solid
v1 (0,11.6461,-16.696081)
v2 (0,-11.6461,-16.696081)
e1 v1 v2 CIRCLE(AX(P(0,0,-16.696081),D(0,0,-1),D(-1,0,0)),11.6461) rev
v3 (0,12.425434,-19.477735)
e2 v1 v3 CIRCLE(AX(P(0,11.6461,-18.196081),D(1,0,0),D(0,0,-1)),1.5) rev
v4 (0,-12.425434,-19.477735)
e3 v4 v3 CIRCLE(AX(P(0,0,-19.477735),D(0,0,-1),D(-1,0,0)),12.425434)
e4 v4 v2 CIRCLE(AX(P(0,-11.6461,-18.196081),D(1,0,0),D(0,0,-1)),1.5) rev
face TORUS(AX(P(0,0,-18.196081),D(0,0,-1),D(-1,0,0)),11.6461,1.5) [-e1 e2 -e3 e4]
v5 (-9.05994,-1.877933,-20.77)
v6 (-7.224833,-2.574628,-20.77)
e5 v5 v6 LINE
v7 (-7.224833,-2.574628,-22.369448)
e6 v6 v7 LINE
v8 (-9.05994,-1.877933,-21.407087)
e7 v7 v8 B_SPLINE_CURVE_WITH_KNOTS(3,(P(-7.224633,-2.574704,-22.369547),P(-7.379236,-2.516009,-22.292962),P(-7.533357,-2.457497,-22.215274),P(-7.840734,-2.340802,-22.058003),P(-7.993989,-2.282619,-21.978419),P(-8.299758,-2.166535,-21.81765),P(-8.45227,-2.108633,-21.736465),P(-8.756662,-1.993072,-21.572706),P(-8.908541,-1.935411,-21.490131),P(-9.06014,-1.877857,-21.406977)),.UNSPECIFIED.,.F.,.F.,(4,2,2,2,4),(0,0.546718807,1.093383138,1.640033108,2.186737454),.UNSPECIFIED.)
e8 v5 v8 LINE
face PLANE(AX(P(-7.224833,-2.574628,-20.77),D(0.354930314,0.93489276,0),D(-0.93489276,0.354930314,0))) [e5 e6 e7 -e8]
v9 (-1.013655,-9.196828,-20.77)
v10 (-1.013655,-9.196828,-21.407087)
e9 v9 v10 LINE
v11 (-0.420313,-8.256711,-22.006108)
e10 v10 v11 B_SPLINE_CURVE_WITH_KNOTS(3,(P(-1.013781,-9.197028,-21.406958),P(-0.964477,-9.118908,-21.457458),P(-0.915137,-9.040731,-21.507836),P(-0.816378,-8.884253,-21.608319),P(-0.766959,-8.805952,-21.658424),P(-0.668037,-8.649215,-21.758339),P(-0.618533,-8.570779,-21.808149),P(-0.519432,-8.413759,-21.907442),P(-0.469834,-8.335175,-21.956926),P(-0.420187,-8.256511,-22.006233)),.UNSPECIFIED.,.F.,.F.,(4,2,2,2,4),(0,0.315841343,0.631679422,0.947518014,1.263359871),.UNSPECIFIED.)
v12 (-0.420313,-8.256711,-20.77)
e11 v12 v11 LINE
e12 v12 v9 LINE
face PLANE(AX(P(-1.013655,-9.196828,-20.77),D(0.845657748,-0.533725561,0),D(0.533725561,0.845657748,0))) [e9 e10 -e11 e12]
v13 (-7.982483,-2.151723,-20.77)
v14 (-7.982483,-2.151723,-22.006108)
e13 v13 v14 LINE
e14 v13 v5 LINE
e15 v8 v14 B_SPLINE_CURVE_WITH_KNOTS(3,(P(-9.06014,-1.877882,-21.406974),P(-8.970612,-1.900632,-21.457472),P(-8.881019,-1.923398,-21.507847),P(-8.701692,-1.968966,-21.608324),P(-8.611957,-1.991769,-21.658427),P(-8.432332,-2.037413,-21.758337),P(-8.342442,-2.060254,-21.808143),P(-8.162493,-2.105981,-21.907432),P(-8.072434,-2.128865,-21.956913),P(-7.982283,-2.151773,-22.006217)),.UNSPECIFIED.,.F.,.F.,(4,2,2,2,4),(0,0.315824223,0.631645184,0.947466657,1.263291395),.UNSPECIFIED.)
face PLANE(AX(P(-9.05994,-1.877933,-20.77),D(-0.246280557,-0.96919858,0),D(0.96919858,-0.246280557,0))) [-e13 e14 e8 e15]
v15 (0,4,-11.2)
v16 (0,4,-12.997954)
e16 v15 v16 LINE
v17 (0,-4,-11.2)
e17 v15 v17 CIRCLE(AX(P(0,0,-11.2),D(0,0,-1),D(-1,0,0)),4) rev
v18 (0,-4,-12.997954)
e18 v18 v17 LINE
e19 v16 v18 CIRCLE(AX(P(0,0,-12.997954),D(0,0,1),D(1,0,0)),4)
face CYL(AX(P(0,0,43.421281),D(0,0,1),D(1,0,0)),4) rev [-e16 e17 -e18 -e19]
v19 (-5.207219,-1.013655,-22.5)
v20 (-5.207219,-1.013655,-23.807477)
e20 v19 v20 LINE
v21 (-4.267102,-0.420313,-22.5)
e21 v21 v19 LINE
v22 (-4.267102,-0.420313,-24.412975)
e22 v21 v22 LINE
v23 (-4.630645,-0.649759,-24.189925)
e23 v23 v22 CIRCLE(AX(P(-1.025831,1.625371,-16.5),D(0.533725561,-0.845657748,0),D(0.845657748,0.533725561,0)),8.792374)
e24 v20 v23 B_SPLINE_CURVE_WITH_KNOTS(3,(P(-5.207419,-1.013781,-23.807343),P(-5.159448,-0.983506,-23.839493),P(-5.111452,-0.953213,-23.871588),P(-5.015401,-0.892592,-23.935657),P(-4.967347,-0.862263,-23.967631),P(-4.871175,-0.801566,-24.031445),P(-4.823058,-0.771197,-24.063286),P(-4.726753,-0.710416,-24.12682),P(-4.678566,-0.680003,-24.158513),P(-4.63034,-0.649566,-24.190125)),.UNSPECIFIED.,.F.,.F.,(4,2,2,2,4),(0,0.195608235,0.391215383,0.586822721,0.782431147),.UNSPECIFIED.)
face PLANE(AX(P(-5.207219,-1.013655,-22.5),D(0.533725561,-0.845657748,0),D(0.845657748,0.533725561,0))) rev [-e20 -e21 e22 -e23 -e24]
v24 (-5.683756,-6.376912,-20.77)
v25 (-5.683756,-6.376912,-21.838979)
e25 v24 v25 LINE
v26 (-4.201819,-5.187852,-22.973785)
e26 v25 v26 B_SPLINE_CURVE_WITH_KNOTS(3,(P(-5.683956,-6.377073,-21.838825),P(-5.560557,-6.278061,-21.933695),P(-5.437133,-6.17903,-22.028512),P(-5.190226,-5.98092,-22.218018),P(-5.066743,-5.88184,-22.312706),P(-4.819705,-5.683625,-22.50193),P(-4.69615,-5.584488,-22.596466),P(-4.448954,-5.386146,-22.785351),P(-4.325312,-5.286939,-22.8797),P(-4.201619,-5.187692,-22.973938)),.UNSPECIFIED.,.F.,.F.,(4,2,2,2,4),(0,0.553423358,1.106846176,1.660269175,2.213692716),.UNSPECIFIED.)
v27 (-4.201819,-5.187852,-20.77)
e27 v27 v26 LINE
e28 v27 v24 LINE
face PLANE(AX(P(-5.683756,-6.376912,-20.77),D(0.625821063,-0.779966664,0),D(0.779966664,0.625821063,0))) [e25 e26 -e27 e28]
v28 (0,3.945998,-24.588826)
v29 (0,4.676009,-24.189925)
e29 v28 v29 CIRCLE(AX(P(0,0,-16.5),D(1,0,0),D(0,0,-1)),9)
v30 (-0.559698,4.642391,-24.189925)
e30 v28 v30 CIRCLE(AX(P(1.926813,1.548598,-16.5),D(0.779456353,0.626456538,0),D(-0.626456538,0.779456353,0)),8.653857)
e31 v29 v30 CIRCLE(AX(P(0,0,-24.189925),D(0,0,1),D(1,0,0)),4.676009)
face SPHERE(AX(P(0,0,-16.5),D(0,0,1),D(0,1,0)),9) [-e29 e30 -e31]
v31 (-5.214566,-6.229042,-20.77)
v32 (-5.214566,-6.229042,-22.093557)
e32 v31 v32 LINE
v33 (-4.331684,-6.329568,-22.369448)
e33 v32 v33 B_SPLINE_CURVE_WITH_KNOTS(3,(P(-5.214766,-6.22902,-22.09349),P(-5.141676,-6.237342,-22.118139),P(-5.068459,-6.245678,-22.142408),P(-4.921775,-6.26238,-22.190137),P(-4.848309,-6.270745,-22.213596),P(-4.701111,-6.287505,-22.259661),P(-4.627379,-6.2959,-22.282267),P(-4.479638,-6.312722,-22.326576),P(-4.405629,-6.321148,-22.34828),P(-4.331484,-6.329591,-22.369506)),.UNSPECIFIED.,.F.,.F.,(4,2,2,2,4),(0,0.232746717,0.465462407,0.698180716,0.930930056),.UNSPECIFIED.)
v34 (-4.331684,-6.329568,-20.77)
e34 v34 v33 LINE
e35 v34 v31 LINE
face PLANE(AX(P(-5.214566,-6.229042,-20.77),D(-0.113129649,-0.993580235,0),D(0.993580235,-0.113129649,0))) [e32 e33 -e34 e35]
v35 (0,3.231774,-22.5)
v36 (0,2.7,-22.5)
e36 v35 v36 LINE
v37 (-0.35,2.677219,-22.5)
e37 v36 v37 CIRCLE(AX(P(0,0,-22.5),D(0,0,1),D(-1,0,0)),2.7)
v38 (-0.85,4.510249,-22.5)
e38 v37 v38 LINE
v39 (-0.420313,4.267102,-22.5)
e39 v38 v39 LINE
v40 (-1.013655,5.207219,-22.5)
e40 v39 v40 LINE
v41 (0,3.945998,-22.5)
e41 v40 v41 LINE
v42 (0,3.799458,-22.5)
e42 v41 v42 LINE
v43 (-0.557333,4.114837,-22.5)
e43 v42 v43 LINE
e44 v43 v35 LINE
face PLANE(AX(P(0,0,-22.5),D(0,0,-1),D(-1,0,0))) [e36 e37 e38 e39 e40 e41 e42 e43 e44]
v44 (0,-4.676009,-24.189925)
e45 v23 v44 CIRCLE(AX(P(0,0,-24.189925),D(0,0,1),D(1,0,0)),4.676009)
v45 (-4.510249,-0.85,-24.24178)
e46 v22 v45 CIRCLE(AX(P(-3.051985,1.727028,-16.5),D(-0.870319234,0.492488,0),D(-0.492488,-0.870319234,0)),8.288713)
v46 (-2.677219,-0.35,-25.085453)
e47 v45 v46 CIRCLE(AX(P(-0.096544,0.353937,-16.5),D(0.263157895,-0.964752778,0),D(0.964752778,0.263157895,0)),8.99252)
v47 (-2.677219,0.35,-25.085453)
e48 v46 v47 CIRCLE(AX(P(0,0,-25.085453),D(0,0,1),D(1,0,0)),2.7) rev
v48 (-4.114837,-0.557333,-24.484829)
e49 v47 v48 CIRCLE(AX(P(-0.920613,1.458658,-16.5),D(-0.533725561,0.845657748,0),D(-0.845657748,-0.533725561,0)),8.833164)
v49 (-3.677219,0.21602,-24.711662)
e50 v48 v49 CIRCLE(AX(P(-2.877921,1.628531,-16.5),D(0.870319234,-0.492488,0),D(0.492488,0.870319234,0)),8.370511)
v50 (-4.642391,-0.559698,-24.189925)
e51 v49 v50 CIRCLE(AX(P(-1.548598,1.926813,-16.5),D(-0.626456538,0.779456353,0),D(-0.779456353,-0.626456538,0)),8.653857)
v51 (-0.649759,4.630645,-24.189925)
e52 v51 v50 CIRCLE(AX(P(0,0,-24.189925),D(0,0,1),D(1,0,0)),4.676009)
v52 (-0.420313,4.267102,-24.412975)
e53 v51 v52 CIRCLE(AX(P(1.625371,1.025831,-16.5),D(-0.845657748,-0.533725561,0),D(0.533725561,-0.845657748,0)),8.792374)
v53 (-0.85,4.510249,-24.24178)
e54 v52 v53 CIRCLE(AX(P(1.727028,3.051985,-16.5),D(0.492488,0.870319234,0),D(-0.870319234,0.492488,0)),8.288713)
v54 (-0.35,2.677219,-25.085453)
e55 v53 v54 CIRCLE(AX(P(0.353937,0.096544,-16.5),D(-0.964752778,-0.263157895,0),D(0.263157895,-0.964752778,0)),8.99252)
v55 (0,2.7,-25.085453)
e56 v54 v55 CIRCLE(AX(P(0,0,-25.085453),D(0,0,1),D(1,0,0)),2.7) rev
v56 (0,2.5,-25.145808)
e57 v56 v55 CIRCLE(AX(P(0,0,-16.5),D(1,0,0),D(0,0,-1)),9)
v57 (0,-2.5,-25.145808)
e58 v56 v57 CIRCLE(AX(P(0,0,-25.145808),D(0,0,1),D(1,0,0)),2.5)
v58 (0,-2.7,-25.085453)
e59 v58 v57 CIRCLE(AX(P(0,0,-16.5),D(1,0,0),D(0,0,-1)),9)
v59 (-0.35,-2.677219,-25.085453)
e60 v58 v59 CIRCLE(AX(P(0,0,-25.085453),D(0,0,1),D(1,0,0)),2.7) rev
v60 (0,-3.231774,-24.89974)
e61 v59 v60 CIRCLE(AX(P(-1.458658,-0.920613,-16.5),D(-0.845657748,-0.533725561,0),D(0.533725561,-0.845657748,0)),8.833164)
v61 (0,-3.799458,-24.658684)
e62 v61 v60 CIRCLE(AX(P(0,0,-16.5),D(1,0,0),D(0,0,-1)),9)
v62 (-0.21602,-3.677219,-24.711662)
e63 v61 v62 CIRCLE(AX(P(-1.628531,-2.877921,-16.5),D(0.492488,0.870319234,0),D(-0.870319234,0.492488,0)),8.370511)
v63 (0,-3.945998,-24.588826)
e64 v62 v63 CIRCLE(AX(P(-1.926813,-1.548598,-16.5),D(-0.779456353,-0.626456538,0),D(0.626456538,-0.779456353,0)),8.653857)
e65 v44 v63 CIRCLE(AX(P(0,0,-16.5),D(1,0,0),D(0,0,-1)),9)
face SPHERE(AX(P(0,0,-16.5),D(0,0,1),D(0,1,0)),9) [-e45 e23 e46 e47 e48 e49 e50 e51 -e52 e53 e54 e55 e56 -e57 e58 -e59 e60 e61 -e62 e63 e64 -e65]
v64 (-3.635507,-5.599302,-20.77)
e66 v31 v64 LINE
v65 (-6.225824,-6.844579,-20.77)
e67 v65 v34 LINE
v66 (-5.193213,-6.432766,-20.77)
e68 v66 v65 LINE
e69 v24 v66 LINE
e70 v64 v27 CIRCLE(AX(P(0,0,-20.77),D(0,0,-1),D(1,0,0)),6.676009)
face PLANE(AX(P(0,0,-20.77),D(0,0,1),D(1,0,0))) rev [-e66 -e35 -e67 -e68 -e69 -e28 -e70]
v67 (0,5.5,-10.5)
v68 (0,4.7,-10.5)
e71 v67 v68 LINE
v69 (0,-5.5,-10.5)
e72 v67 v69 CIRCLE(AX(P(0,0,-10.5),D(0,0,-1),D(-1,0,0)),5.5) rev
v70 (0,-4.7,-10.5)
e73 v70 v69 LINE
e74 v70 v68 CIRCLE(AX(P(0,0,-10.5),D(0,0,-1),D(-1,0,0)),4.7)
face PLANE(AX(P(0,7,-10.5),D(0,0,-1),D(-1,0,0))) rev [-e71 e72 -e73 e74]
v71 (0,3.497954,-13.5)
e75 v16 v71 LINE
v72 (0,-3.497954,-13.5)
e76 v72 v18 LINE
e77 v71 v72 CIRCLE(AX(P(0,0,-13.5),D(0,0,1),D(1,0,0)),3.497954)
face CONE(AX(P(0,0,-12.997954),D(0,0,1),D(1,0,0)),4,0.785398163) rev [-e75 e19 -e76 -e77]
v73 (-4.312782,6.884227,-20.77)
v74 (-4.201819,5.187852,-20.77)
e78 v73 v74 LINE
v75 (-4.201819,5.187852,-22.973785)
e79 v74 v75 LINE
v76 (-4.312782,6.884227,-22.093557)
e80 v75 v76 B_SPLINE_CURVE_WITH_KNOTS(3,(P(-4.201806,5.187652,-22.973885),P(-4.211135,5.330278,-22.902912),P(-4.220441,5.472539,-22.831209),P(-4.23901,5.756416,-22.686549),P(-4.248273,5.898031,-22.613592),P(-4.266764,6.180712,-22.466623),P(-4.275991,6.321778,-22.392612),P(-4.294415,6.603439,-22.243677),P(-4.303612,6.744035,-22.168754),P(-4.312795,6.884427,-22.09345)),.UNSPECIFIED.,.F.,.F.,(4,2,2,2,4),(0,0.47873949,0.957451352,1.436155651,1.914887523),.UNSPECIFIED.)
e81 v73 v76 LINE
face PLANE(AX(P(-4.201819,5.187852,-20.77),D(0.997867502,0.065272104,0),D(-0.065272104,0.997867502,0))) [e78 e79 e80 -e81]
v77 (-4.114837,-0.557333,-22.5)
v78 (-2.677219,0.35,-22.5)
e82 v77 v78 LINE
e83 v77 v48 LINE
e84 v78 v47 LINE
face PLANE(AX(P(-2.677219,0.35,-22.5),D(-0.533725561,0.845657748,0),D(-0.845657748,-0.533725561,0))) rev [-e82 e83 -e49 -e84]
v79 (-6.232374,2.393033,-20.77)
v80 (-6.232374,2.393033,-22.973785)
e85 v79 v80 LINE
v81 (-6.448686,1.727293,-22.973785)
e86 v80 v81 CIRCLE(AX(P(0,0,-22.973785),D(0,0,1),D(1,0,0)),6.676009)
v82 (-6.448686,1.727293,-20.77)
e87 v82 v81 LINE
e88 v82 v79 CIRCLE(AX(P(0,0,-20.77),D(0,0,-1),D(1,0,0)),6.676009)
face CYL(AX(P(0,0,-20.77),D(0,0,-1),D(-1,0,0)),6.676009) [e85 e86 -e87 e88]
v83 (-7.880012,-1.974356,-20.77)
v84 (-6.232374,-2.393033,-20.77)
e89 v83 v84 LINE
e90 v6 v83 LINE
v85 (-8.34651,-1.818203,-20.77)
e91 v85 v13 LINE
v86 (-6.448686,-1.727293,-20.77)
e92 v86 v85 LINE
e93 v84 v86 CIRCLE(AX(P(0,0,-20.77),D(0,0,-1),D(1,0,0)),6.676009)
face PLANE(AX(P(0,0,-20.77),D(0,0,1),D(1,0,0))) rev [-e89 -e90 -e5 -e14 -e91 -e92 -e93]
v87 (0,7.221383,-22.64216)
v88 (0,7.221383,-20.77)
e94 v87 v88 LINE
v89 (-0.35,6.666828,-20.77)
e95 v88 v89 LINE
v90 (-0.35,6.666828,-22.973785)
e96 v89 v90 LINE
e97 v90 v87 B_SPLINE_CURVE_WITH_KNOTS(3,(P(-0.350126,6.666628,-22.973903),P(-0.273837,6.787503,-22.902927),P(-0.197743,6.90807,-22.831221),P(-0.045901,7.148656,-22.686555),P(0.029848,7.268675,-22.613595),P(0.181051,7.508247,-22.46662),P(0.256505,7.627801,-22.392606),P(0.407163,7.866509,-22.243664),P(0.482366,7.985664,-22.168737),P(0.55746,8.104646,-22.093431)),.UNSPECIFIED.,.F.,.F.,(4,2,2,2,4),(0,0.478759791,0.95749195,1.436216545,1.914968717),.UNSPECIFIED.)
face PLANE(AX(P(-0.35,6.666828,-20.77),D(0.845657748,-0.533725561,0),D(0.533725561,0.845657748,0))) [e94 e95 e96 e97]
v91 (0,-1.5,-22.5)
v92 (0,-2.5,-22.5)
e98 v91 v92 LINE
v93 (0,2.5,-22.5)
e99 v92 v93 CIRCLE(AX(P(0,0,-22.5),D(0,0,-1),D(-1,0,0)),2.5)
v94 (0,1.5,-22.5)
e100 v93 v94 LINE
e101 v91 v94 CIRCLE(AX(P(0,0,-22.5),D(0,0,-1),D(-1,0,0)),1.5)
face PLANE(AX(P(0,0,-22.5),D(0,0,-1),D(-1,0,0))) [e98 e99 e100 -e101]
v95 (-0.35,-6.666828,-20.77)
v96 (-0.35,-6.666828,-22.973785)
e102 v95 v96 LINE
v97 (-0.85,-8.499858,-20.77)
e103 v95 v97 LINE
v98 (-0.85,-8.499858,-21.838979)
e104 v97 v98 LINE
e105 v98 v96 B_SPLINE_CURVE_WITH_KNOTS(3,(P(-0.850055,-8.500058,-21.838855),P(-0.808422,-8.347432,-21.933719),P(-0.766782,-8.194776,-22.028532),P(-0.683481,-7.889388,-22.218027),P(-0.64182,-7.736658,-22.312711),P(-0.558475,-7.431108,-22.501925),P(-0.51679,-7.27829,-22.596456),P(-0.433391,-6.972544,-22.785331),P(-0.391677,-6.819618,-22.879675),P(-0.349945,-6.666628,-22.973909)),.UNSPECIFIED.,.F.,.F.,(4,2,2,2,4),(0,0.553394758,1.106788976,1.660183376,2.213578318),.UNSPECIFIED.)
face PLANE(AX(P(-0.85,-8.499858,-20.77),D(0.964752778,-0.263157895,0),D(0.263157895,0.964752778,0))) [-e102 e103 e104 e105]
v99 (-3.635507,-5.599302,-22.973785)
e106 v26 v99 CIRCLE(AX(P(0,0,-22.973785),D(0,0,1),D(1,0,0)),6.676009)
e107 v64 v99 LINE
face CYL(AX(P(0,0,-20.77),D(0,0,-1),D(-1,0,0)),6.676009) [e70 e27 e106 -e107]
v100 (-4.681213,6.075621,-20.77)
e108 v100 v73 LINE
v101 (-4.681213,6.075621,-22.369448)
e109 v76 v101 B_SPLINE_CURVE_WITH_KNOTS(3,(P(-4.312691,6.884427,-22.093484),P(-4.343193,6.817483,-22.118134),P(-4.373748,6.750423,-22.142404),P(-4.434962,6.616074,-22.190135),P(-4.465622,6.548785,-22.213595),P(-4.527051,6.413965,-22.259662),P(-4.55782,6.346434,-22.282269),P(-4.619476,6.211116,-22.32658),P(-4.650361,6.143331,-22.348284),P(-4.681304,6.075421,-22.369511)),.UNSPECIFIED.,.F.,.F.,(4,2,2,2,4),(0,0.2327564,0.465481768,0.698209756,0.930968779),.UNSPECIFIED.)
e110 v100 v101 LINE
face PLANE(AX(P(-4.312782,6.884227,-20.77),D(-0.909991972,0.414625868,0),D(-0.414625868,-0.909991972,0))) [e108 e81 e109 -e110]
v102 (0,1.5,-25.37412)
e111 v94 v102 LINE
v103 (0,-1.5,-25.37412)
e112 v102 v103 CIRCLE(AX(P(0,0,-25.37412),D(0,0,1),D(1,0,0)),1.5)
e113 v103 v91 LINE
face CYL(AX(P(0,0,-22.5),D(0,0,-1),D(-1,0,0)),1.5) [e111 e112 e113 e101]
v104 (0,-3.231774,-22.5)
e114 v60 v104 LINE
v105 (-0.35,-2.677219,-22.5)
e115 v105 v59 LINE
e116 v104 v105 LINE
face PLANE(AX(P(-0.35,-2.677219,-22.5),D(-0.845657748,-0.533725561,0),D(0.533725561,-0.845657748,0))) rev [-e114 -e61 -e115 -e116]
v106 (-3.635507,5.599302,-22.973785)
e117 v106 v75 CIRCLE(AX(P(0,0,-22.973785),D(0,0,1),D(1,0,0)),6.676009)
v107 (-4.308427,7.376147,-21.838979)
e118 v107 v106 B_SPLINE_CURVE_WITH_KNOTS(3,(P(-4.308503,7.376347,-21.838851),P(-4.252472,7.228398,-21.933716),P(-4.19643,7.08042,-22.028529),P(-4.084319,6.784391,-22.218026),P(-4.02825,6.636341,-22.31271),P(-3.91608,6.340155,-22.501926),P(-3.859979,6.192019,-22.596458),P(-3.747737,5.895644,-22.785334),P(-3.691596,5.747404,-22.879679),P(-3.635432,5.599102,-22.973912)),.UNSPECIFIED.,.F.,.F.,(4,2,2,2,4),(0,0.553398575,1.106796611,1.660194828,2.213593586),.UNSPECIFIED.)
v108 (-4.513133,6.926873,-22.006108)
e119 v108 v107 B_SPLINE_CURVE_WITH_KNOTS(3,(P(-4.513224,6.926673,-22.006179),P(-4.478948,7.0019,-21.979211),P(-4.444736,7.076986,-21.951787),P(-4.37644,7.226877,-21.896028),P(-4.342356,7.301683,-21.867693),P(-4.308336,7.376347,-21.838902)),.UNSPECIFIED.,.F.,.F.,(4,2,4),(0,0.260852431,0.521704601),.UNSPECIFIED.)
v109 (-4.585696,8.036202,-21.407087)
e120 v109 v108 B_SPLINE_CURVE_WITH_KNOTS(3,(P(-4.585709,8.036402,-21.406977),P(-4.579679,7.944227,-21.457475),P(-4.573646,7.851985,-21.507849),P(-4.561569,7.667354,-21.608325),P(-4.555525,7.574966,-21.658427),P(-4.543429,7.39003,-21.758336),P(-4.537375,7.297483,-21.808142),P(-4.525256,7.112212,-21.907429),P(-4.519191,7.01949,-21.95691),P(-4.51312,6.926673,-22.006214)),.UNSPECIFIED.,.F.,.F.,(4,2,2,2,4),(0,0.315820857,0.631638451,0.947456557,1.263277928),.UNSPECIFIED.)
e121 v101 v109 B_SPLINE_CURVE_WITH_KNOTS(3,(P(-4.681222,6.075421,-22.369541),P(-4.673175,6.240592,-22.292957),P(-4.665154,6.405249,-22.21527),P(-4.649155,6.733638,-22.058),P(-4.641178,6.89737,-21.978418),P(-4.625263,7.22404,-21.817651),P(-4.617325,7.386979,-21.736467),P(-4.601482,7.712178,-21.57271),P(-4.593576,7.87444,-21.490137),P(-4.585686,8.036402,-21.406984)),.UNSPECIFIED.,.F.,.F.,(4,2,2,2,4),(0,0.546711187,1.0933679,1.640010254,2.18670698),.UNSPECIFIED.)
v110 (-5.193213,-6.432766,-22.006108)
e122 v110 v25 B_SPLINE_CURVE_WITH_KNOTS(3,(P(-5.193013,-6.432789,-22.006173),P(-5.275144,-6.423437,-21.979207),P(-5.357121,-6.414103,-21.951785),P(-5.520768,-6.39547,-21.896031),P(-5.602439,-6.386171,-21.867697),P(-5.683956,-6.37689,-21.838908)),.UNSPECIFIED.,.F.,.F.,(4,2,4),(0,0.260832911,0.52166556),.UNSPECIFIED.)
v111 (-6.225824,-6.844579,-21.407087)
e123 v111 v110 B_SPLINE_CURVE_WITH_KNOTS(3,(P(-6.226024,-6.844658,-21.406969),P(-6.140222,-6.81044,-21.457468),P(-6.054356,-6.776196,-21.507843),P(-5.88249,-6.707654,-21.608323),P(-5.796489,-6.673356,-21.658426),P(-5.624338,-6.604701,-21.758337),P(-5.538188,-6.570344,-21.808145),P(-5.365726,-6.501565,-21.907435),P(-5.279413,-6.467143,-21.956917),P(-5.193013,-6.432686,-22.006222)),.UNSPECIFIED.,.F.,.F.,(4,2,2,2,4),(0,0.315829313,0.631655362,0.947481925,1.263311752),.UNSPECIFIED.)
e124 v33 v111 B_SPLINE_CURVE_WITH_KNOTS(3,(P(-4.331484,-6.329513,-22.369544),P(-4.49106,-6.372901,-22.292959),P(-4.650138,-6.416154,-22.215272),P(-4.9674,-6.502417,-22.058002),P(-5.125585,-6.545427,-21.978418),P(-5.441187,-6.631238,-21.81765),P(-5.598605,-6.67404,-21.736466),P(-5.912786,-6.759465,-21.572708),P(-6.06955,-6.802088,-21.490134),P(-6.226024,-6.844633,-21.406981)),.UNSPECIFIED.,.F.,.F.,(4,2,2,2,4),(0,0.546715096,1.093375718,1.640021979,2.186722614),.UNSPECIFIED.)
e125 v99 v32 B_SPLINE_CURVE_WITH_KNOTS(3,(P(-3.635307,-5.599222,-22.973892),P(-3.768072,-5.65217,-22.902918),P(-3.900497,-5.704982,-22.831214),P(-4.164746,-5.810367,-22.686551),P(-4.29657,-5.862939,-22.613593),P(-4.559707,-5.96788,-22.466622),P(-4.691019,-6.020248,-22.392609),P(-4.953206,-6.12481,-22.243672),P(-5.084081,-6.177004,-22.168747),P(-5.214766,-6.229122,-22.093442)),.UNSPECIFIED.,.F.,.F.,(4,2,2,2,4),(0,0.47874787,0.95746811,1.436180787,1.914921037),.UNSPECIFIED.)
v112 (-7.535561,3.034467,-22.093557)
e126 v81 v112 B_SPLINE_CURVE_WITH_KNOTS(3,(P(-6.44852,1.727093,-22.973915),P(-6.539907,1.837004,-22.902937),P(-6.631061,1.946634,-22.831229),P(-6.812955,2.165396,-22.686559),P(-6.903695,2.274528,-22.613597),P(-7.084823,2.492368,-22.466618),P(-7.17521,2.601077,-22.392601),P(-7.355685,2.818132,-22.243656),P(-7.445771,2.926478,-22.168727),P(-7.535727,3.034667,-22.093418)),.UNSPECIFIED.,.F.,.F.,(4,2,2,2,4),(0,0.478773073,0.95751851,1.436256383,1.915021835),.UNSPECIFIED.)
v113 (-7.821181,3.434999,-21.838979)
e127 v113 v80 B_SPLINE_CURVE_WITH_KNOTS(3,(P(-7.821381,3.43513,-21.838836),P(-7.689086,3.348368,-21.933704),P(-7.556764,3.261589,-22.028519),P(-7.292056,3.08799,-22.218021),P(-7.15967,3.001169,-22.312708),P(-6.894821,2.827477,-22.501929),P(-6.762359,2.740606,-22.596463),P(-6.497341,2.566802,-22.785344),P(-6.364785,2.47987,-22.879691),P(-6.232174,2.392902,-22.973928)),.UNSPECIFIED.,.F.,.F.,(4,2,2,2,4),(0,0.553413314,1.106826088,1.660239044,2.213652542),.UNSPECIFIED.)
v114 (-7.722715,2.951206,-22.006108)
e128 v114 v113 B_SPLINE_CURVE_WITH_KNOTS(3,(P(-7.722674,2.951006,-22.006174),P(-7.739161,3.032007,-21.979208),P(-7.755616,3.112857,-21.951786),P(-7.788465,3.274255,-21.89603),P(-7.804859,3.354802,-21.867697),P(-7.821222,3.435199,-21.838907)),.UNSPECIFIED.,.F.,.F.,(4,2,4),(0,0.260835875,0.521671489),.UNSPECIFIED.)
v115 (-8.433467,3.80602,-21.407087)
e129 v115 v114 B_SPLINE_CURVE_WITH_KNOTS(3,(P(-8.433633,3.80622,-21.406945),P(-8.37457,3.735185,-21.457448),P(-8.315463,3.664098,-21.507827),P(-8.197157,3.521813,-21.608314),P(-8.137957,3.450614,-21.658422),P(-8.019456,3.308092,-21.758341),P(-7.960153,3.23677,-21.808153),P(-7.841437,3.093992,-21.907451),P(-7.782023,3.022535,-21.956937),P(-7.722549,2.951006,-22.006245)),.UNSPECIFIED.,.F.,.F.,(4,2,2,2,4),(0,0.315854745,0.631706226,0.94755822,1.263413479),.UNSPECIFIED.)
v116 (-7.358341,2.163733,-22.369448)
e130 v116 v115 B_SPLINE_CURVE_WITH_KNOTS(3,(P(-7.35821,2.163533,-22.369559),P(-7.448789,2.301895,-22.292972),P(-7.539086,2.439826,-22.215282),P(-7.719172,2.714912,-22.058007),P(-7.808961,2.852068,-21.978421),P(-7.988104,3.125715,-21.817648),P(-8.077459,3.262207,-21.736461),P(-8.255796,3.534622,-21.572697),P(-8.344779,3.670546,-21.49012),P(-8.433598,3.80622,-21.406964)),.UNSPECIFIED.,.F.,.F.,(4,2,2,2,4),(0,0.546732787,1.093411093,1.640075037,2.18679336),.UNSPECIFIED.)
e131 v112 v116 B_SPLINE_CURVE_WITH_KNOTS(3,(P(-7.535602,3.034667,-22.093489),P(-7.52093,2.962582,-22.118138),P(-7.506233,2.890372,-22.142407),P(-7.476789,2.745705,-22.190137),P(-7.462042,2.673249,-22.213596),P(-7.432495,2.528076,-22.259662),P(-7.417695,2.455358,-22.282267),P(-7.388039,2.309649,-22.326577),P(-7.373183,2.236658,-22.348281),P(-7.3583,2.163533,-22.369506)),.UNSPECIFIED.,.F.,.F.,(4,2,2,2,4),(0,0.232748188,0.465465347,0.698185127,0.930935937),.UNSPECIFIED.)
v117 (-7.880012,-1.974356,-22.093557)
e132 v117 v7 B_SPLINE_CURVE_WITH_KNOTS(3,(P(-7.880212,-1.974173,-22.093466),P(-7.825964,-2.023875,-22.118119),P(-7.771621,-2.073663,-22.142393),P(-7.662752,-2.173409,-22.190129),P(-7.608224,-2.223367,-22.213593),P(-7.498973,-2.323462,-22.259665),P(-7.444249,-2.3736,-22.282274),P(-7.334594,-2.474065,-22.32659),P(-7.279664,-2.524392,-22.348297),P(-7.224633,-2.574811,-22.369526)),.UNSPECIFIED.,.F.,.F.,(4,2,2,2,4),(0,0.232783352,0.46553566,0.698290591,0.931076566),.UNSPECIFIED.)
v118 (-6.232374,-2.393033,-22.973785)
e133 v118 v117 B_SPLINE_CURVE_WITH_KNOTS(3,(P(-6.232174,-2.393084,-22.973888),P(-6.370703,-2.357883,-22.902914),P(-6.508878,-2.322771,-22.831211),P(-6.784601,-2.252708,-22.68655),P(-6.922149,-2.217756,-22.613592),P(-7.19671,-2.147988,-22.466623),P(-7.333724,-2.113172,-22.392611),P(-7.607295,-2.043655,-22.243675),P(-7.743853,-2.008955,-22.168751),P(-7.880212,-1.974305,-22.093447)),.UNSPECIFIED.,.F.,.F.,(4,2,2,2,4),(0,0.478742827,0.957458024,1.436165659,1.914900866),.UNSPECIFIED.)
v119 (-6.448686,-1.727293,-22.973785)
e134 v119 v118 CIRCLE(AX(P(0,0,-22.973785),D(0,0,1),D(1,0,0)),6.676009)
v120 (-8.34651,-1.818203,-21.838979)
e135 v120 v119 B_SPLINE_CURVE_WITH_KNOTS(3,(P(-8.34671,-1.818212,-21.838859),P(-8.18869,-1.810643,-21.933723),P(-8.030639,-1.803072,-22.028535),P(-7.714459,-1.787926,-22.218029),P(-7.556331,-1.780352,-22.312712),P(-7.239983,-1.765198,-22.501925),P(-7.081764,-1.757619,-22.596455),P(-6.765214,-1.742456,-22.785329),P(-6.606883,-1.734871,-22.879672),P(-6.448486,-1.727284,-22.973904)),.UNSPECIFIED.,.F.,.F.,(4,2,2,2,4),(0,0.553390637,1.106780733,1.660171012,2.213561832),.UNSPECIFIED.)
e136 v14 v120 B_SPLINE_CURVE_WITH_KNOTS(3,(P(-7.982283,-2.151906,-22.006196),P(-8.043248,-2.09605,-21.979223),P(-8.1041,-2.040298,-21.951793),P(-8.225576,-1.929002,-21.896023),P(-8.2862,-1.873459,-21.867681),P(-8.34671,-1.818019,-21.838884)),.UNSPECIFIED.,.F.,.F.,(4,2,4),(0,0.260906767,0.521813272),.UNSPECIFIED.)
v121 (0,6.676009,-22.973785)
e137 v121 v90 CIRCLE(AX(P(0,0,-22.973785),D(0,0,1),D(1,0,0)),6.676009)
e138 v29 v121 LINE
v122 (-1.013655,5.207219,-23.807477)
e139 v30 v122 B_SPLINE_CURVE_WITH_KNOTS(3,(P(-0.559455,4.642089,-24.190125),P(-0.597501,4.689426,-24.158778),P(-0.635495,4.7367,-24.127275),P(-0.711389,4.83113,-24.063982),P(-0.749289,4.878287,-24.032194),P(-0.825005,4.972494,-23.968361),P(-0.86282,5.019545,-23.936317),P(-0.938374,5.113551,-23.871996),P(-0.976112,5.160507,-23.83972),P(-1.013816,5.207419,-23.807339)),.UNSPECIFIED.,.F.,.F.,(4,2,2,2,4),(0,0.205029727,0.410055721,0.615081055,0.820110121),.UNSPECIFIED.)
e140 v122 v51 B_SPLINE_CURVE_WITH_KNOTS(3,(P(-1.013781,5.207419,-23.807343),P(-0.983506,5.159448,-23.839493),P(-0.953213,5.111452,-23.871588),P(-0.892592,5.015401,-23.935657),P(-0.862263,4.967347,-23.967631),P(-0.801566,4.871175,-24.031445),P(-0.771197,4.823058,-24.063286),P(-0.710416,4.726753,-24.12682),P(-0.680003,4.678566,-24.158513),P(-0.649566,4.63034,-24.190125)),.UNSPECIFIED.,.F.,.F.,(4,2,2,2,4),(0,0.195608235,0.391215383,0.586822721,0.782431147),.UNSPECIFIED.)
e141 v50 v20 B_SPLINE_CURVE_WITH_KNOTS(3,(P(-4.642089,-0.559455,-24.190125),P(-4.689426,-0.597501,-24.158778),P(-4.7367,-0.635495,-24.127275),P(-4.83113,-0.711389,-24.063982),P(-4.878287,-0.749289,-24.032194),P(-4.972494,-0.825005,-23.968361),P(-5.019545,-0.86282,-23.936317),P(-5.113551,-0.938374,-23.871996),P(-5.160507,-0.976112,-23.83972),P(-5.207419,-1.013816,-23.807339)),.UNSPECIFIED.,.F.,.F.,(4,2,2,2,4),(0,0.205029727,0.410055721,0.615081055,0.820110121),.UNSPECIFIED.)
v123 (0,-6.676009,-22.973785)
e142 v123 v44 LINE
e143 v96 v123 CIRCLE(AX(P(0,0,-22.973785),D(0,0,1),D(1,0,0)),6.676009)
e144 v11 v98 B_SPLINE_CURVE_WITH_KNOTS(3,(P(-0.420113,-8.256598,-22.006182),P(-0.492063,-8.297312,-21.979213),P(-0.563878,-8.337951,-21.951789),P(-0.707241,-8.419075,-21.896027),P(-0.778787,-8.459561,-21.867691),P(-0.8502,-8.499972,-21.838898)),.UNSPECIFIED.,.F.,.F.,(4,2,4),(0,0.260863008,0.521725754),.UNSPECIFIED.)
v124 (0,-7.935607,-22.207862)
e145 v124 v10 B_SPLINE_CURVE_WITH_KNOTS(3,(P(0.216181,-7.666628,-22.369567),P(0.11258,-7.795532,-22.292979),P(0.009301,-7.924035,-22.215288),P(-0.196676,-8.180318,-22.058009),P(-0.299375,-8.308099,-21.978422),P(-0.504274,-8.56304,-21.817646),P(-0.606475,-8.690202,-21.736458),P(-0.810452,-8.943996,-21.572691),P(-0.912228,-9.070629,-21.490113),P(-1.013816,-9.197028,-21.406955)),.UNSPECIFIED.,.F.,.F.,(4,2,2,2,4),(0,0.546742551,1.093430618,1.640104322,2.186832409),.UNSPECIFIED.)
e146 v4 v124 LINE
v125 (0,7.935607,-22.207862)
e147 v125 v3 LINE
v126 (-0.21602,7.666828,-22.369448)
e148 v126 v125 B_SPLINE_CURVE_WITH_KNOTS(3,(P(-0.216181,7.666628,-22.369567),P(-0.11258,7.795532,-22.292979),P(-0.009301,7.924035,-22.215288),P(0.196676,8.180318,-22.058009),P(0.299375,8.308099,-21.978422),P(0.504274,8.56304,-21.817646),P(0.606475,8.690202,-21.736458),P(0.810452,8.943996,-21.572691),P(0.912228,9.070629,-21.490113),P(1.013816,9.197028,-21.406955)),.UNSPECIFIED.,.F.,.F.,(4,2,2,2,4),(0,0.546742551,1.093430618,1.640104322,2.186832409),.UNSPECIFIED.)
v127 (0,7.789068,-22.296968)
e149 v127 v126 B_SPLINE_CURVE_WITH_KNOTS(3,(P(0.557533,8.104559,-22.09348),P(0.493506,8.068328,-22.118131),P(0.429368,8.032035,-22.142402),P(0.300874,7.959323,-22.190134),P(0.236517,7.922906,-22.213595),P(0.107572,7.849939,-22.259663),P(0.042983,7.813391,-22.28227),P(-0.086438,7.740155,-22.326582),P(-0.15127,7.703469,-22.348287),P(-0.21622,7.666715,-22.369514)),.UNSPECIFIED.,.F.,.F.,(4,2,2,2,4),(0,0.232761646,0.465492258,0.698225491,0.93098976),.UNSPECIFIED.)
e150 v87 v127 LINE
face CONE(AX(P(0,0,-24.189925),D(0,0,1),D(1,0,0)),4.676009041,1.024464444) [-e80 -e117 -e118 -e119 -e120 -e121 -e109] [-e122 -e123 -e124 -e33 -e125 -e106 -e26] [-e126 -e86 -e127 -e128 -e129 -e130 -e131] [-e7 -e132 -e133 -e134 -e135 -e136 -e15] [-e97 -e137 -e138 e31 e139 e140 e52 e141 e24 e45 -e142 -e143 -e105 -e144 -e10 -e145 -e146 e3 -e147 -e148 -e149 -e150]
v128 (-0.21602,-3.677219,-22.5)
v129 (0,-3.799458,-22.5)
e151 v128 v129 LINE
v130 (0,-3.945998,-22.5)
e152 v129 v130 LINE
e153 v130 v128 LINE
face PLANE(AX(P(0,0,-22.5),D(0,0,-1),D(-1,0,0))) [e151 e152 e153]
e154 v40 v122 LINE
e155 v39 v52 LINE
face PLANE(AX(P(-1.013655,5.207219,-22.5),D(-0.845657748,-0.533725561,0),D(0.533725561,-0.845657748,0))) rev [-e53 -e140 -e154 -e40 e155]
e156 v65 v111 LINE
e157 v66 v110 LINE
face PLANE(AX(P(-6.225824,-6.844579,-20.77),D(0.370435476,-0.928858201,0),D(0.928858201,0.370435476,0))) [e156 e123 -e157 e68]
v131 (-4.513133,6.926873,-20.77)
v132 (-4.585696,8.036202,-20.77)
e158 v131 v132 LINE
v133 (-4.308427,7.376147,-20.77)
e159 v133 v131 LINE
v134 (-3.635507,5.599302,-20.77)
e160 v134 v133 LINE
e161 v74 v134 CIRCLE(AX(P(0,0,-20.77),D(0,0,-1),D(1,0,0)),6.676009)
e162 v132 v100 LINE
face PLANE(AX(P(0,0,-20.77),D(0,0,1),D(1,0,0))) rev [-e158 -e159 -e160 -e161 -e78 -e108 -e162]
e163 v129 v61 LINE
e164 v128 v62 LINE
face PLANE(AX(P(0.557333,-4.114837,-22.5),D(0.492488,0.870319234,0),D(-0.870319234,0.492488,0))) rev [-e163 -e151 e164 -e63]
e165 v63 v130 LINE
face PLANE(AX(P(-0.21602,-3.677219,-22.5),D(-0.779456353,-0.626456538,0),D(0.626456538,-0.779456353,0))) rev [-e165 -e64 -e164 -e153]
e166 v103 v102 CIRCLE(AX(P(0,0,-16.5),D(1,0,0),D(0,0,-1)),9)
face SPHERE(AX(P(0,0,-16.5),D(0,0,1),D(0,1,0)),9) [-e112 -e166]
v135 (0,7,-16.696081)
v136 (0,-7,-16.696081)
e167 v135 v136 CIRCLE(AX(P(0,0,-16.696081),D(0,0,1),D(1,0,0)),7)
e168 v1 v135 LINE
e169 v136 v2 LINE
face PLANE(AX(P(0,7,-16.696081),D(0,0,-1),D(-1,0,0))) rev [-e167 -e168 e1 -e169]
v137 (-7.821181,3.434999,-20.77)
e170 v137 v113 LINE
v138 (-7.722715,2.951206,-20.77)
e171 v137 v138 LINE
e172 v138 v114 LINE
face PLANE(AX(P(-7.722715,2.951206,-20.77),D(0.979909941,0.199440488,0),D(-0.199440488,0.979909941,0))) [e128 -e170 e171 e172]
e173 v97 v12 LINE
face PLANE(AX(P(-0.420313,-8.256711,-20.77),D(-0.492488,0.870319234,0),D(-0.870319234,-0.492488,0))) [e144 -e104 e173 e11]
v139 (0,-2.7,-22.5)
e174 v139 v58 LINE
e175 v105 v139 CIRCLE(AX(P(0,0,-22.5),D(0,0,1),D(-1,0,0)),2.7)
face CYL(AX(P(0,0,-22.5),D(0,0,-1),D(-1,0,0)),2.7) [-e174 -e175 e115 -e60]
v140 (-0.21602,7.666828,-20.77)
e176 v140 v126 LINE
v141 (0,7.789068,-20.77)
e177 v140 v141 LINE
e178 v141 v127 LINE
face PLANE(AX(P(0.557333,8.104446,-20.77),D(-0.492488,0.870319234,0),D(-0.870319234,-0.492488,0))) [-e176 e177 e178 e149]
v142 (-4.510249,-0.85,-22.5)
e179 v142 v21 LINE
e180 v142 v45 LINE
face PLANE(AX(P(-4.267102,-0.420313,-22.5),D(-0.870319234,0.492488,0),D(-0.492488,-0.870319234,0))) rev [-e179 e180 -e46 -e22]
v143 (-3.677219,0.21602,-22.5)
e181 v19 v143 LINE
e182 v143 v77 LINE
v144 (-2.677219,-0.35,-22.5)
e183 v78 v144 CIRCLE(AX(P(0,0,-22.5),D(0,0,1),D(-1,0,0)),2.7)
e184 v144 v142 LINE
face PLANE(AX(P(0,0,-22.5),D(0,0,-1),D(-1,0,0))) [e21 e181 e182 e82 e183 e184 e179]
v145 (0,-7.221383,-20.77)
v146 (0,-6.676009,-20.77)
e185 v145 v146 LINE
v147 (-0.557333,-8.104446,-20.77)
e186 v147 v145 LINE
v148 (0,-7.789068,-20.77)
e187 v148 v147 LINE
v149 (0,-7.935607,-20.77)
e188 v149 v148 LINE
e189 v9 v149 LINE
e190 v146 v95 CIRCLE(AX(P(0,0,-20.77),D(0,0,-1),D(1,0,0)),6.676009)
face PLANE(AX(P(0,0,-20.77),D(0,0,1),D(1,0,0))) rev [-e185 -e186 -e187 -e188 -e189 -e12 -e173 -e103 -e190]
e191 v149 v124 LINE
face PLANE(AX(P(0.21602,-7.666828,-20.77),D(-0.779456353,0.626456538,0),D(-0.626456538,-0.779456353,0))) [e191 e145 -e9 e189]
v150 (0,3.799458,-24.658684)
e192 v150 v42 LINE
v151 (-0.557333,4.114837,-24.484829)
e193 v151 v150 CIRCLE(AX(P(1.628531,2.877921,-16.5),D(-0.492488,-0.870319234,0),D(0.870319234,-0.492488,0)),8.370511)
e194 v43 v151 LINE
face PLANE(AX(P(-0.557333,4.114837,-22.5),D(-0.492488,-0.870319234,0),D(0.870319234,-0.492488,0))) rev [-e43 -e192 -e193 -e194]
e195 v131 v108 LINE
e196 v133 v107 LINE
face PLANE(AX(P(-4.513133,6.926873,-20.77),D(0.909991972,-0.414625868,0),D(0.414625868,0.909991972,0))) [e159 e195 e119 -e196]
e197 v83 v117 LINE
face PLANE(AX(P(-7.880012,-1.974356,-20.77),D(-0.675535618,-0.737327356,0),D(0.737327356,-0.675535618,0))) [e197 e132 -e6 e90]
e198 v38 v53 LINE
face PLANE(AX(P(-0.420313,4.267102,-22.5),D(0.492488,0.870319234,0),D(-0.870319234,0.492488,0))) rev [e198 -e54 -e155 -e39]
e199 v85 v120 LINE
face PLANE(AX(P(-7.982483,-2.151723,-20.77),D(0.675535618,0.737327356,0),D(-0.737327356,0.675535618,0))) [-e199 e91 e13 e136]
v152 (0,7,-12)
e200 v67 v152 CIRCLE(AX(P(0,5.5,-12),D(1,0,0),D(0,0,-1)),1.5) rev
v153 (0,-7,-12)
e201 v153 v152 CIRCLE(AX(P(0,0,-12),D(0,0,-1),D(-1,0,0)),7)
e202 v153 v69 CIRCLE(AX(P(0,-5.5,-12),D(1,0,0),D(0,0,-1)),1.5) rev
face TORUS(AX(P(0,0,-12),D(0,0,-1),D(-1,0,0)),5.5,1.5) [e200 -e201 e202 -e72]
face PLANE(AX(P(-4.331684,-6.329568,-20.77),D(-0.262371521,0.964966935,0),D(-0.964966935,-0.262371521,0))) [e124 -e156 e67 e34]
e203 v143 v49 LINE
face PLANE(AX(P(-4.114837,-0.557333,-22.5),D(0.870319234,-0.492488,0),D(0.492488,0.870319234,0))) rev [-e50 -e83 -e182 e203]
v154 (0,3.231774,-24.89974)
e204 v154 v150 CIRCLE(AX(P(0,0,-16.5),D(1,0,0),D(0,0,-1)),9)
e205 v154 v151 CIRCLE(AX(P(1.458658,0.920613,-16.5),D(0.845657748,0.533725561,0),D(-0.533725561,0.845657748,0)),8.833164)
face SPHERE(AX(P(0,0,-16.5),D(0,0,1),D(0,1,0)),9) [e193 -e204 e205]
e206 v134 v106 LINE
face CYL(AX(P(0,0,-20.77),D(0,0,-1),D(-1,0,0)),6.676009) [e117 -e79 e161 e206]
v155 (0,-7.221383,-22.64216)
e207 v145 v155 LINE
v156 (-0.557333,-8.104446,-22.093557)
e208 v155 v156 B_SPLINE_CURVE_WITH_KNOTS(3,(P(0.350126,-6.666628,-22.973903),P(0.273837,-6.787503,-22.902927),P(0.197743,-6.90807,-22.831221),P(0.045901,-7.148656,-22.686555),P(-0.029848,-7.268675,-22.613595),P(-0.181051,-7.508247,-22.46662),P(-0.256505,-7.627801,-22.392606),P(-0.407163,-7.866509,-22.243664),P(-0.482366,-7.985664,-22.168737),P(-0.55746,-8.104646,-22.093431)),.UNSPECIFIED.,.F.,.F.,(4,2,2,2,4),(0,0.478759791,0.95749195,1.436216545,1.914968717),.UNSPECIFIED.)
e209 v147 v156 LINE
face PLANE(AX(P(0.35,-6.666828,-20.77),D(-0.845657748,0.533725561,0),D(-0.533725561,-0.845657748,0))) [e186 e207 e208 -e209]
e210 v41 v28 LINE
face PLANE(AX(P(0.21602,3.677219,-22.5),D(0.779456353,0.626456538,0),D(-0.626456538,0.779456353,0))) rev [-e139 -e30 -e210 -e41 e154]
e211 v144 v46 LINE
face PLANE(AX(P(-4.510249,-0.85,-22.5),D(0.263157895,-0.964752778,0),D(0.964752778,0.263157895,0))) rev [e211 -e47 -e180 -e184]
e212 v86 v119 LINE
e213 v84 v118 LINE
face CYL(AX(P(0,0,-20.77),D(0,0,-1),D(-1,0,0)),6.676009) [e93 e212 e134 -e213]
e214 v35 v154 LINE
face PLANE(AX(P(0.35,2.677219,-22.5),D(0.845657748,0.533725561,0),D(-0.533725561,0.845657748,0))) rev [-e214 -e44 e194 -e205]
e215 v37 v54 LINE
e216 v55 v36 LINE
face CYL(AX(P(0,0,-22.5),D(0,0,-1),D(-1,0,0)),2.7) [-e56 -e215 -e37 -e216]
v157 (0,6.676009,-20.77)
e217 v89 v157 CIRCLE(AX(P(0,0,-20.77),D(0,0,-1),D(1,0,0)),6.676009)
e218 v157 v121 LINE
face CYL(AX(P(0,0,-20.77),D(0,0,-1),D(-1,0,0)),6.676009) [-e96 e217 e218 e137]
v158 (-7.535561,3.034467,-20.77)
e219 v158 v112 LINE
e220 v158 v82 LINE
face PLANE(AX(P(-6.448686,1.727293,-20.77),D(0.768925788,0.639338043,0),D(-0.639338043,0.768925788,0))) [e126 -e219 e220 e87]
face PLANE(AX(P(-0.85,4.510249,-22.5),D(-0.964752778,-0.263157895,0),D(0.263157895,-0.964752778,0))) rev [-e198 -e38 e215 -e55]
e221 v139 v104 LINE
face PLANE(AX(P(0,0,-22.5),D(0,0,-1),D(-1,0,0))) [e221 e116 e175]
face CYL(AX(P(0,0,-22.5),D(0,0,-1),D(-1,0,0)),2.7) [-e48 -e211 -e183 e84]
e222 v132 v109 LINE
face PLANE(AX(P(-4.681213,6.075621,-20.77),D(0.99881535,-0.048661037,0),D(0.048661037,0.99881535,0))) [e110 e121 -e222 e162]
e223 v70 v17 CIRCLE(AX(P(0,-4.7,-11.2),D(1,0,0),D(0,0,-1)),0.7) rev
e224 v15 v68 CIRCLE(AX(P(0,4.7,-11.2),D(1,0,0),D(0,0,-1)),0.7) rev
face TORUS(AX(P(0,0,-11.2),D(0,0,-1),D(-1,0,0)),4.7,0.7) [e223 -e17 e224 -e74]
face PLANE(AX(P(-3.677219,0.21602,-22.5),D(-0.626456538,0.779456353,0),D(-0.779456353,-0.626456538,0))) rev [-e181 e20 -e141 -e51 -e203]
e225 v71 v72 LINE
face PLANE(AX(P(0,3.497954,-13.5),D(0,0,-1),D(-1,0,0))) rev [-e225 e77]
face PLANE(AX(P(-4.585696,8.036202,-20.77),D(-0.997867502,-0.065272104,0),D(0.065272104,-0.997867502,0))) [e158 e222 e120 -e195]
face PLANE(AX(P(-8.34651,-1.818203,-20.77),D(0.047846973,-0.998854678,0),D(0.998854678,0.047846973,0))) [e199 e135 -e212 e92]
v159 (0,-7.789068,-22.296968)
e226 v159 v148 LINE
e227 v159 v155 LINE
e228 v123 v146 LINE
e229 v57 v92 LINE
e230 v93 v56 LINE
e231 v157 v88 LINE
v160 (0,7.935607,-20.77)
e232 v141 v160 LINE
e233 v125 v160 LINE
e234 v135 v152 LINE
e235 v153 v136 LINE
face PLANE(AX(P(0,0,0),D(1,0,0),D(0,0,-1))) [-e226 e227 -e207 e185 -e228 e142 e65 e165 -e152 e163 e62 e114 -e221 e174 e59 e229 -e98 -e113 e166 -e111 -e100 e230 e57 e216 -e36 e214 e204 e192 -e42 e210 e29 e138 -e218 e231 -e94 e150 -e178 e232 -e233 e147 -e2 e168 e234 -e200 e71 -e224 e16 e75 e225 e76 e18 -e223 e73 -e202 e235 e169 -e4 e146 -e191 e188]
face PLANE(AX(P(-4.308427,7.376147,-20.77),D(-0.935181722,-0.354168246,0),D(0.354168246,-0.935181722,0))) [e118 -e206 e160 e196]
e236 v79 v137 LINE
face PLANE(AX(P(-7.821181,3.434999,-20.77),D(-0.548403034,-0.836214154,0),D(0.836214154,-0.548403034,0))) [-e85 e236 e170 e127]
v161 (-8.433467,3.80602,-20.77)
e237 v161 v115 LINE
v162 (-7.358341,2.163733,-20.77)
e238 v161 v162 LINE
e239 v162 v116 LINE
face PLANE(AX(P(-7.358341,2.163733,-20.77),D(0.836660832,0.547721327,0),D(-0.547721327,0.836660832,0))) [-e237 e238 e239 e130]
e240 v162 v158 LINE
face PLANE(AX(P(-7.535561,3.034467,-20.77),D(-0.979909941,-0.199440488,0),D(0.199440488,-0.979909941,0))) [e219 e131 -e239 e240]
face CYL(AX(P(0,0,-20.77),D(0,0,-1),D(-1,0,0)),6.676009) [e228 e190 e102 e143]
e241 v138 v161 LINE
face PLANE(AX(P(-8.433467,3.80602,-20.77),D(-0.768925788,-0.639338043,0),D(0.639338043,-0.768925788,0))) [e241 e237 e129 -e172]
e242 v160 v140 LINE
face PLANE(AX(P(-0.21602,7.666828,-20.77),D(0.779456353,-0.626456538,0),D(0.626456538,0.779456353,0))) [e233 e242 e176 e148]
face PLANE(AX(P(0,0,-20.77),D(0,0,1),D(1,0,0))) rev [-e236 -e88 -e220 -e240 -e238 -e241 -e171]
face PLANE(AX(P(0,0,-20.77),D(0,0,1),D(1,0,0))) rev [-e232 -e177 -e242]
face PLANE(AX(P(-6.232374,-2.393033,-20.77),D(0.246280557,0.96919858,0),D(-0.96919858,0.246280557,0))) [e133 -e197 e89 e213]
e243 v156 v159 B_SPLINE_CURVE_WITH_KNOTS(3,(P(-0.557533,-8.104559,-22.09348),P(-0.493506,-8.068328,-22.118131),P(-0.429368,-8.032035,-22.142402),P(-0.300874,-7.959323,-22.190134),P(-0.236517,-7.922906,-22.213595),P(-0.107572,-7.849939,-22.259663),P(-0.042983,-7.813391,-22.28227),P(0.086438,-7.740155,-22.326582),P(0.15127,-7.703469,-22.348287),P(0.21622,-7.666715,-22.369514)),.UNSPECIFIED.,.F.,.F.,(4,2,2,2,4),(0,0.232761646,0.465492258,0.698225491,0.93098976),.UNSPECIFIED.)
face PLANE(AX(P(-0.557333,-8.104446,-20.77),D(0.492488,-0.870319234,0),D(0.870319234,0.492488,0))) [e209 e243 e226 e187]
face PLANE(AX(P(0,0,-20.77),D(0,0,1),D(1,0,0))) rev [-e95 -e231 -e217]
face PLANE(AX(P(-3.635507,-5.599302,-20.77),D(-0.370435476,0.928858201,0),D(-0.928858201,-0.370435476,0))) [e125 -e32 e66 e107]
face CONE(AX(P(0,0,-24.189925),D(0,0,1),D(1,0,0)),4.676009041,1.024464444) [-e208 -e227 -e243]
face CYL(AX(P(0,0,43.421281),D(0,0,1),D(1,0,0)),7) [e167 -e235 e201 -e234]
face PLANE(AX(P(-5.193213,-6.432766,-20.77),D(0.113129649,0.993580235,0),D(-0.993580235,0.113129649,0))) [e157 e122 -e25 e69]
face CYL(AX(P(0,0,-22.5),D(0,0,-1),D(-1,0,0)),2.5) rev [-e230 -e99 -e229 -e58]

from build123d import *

# Parameters (mm, degrees)
REDONDEO3_R           = 0.7
REDONDEO5_R           = 1.5
CROQUIS2_R            = 2.5
CROQUIS2_R_2          = 1.5
CORTAR_EXTRUIR1_DEPTH = 3
CORTAR_EXTRUIR3_DEPTH = 3


# Read off the part's stored shape, not the designer's step: Sólido-Eliminar/Conservar 1
with BuildPart() as part:
    # Croquis1 → Revolución1 (revolve)
    with BuildSketch(Plane(origin=(0, 0, 0), x_dir=(0, 0, -1), z_dir=(1, 0, 0)), mode=Mode.PRIVATE) as revoluci_n1_sk:
        with BuildLine():
            Line((10.5, 4), (12.997954185, 4))
            Line((12.997954185, 4), (13.5, 3.497954185))
            Line((13.5, 3.497954185), (13.5, 0))
            Line((13.5, 0), (25.5, 0))
            ThreePointArc((25.5, 0), (25.166294504, 2.428032035), (24.189924541, 4.676009041))
            Line((24.189924541, 4.676009041), (16.696080767, 17))
            Line((16.696080767, 17), (16.696080767, 7))
            Line((16.696080767, 7), (10.5, 7))
            Line((10.5, 7), (10.5, 4))
        make_face()
    revolve(revoluci_n1_sk.sketch.rotate(Axis((0, 0, 43.421280629), (0, 0, -1)), 90), axis=Axis((0, 0, 43.421280629), (0, 0, -1)))

    # Redondeo3
    redondeo3_edges = [part.edges().sort_by_distance(p)[0] for p in [
        (-4, 0, -10.5),
    ]]
    fillet(redondeo3_edges, radius=REDONDEO3_R)

    # Redondeo5
    redondeo5_edges = [part.edges().sort_by_distance(p)[0] for p in [
        (-17, 0, -16.696080767),
        (-7, 0, -10.5),
    ]]
    fillet(redondeo5_edges, radius=REDONDEO5_R)

    # Croquis2 → Cortar-Extruir1 (cut)
    # profile 1 of 5: a face of its own
    with BuildSketch(Plane(origin=(0, 0, -25.5), x_dir=(-1, 0, 0), z_dir=(0, 0, -1))):
        Circle(CROQUIS2_R)
        Circle(CROQUIS2_R_2, mode=Mode.SUBTRACT)
    # profile 2 of 5: a face of its own
    with BuildSketch(Plane(origin=(0, 0, -25.5), x_dir=(-1, 0, 0), z_dir=(0, 0, -1))):
        with BuildLine():
            Line((-0.35, 2.677218706), (0.557333453, 4.114836877))
            Line((0.557333453, 4.114836877), (-0.216020438, 3.677218706))
            Line((-0.216020438, 3.677218706), (1.01365522, 5.207218706))
            Line((1.01365522, 5.207218706), (0.420313019, 4.267101787))
            Line((0.420313019, 4.267101787), (0.85, 4.510248984))
            Line((0.85, 4.510248984), (0.35, 2.677218706))
            ThreePointArc((0.35, 2.677218706), (0, 2.7), (-0.35, 2.677218706))
        make_face()
    # profile 3 of 5: a face of its own
    with BuildSketch(Plane(origin=(0, 0, -25.5), x_dir=(-1, 0, 0), z_dir=(0, 0, -1))):
        with BuildLine():
            Line((4.510248984, -0.85), (2.677218706, -0.35))
            ThreePointArc((2.677218706, -0.35), (2.7, 0), (2.677218706, 0.35))
            Line((2.677218706, 0.35), (4.114836877, -0.557333453))
            Line((4.114836877, -0.557333453), (3.677218706, 0.216020438))
            Line((3.677218706, 0.216020438), (5.207218706, -1.01365522))
            Line((5.207218706, -1.01365522), (4.267101787, -0.420313019))
            Line((4.267101787, -0.420313019), (4.510248984, -0.85))
        make_face()
    # profile 4 of 5: a face of its own
    with BuildSketch(Plane(origin=(0, 0, -25.5), x_dir=(-1, 0, 0), z_dir=(0, 0, -1))):
        with BuildLine():
            Line((-0.85, -4.510248984), (-0.35, -2.677218706))
            ThreePointArc((-0.35, -2.677218706), (0, -2.7), (0.35, -2.677218706))
            Line((0.35, -2.677218706), (-0.557333453, -4.114836877))
            Line((-0.557333453, -4.114836877), (0.216020438, -3.677218706))
            Line((0.216020438, -3.677218706), (-1.01365522, -5.207218706))
            Line((-1.01365522, -5.207218706), (-0.420313019, -4.267101787))
            Line((-0.420313019, -4.267101787), (-0.85, -4.510248984))
        make_face()
    # profile 5 of 5: a face of its own
    with BuildSketch(Plane(origin=(0, 0, -25.5), x_dir=(-1, 0, 0), z_dir=(0, 0, -1))):
        with BuildLine():
            Line((-4.510248984, 0.85), (-2.677218706, 0.35))
            ThreePointArc((-2.677218706, 0.35), (-2.7, 0), (-2.677218706, -0.35))
            Line((-2.677218706, -0.35), (-4.114836877, 0.557333453))
            Line((-4.114836877, 0.557333453), (-3.677218706, -0.216020438))
            Line((-3.677218706, -0.216020438), (-5.207218706, 1.01365522))
            Line((-5.207218706, 1.01365522), (-4.267101787, 0.420313019))
            Line((-4.267101787, 0.420313019), (-4.510248984, 0.85))
        make_face()
    extrude(amount=-CORTAR_EXTRUIR1_DEPTH, mode=Mode.SUBTRACT)

    # Croquis3 → Cortar-Extruir3 (cut)
    with BuildSketch(Plane.XY.offset(-23.77)):
        with BuildLine():
            Line((-0.35, 6.666828085), (0.557333453, 8.104446256))
            Line((0.557333453, 8.104446256), (-0.216020438, 7.666828085))
            Line((-0.216020438, 7.666828085), (1.01365522, 9.196828085))
            Line((1.01365522, 9.196828085), (0.420313019, 8.256711166))
            Line((0.420313019, 8.256711166), (0.85, 8.499858363))
            Line((0.85, 8.499858363), (0.35, 6.666828085))
            ThreePointArc((0.35, 6.666828085), (0, 6.676009041), (-0.35, 6.666828085))
        make_face()
        with BuildLine():
            Line((3.63550728, 5.599302058), (5.214566222, 6.229042367))
            Line((5.214566222, 6.229042367), (4.331684274, 6.329567842))
            Line((4.331684274, 6.329567842), (6.225824216, 6.844578626))
            Line((6.225824216, 6.844578626), (5.193213431, 6.432765857))
            Line((5.193213431, 6.432765857), (5.683755838, 6.376912401))
            Line((5.683755838, 6.376912401), (4.201819176, 5.187852381))
            ThreePointArc((4.201819176, 5.187852381), (3.924059658, 5.401004769), (3.63550728, 5.599302058))
        make_face()
        with BuildLine():
            Line((6.232374345, 2.393032958), (7.880011931, 1.974356011))
            Line((7.880011931, 1.974356011), (7.224832823, 2.574627817))
            Line((7.224832823, 2.574627817), (9.059939969, 1.87793277))
            Line((9.059939969, 1.87793277), (7.982482824, 2.151722632))
            Line((7.982482824, 2.151722632), (8.346510129, 1.818202645))
            Line((8.346510129, 1.818202645), (6.448686241, 1.727293396))
            ThreePointArc((6.448686241, 1.727293396), (6.349261901, 2.063000248), (6.232374345, 2.393032958))
        make_face()
        with BuildLine():
            Line((6.448686241, -1.727293396), (7.535560914, -3.034467235))
            Line((7.535560914, -3.034467235), (7.358340796, -2.163732526))
            Line((7.358340796, -2.163732526), (8.43346659, -3.806019575))
            Line((8.43346659, -3.806019575), (7.722715092, -2.951205504))
            Line((7.722715092, -2.951205504), (7.821181238, -3.434998723))
            Line((7.821181238, -3.434998723), (6.232374345, -2.393032958))
            ThreePointArc((6.232374345, -2.393032958), (6.349261901, -2.063000248), (6.448686241, -1.727293396))
        make_face()
        with BuildLine():
            Line((4.201819176, -5.187852381), (4.312781752, -6.884227135))
            Line((4.312781752, -6.884227135), (4.681212686, -6.075620586))
            Line((4.681212686, -6.075620586), (4.585695617, -8.036201804))
            Line((4.585695617, -8.036201804), (4.513132681, -6.926873445))
            Line((4.513132681, -6.926873445), (4.308426947, -7.37614733))
            Line((4.308426947, -7.37614733), (3.63550728, -5.599302058))
            ThreePointArc((3.63550728, -5.599302058), (3.924059658, -5.401004769), (4.201819176, -5.187852381))
        make_face()
        with BuildLine():
            Line((0.35, -6.666828085), (-0.557333453, -8.104446256))
            Line((-0.557333453, -8.104446256), (0.216020438, -7.666828085))
            Line((0.216020438, -7.666828085), (-1.01365522, -9.196828085))
            Line((-1.01365522, -9.196828085), (-0.420313019, -8.256711166))
            Line((-0.420313019, -8.256711166), (-0.85, -8.499858363))
            Line((-0.85, -8.499858363), (-0.35, -6.666828085))
            ThreePointArc((-0.35, -6.666828085), (0, -6.676009041), (0.35, -6.666828085))
        make_face()
        with BuildLine():
            Line((-3.63550728, -5.599302058), (-5.214566222, -6.229042367))
            Line((-5.214566222, -6.229042367), (-4.331684274, -6.329567842))
            Line((-4.331684274, -6.329567842), (-6.225824216, -6.844578626))
            Line((-6.225824216, -6.844578626), (-5.193213431, -6.432765857))
            Line((-5.193213431, -6.432765857), (-5.683755838, -6.376912401))
            Line((-5.683755838, -6.376912401), (-4.201819176, -5.187852381))
            ThreePointArc((-4.201819176, -5.187852381), (-3.924059658, -5.401004769), (-3.63550728, -5.599302058))
        make_face()
        with BuildLine():
            Line((-6.232374345, -2.393032958), (-7.880011931, -1.974356011))
            Line((-7.880011931, -1.974356011), (-7.224832823, -2.574627817))
            Line((-7.224832823, -2.574627817), (-9.059939969, -1.87793277))
            Line((-9.059939969, -1.87793277), (-7.982482824, -2.151722632))
            Line((-7.982482824, -2.151722632), (-8.346510129, -1.818202645))
            Line((-8.346510129, -1.818202645), (-6.448686241, -1.727293396))
            ThreePointArc((-6.448686241, -1.727293396), (-6.349261901, -2.063000248), (-6.232374345, -2.393032958))
        make_face()
        with BuildLine():
            Line((-6.448686241, 1.727293396), (-7.535560914, 3.034467235))
            Line((-7.535560914, 3.034467235), (-7.358340796, 2.163732526))
            Line((-7.358340796, 2.163732526), (-8.43346659, 3.806019575))
            Line((-8.43346659, 3.806019575), (-7.722715092, 2.951205504))
            Line((-7.722715092, 2.951205504), (-7.821181238, 3.434998723))
            Line((-7.821181238, 3.434998723), (-6.232374345, 2.393032958))
            ThreePointArc((-6.232374345, 2.393032958), (-6.349261901, 2.063000248), (-6.448686241, 1.727293396))
        make_face()
        with BuildLine():
            Line((-4.201819176, 5.187852381), (-4.312781752, 6.884227135))
            Line((-4.312781752, 6.884227135), (-4.681212686, 6.075620586))
            Line((-4.681212686, 6.075620586), (-4.585695617, 8.036201804))
            Line((-4.585695617, 8.036201804), (-4.513132681, 6.926873445))
            Line((-4.513132681, 6.926873445), (-4.308426947, 7.37614733))
            Line((-4.308426947, 7.37614733), (-3.63550728, 5.599302058))
            ThreePointArc((-3.63550728, 5.599302058), (-3.924059658, 5.401004769), (-4.201819176, 5.187852381))
        make_face()
    extrude(amount=CORTAR_EXTRUIR3_DEPTH, mode=Mode.SUBTRACT)


with BuildPart() as body_2:
    # Partir1: the piece on the far side of the plane
    add(part.part)
    split(bisect_by=Plane(origin=(0, 0, 0), x_dir=(0, 0, 1), z_dir=(1, 0, 0)), keep=Keep.BOTTOM)


with BuildPart() as part_1:
    add(part.part)

    # Partir1
    split(bisect_by=Plane(origin=(0, 0, 0), x_dir=(0, 0, 1), z_dir=(1, 0, 0)), keep=Keep.TOP)


solid = body_2.part
